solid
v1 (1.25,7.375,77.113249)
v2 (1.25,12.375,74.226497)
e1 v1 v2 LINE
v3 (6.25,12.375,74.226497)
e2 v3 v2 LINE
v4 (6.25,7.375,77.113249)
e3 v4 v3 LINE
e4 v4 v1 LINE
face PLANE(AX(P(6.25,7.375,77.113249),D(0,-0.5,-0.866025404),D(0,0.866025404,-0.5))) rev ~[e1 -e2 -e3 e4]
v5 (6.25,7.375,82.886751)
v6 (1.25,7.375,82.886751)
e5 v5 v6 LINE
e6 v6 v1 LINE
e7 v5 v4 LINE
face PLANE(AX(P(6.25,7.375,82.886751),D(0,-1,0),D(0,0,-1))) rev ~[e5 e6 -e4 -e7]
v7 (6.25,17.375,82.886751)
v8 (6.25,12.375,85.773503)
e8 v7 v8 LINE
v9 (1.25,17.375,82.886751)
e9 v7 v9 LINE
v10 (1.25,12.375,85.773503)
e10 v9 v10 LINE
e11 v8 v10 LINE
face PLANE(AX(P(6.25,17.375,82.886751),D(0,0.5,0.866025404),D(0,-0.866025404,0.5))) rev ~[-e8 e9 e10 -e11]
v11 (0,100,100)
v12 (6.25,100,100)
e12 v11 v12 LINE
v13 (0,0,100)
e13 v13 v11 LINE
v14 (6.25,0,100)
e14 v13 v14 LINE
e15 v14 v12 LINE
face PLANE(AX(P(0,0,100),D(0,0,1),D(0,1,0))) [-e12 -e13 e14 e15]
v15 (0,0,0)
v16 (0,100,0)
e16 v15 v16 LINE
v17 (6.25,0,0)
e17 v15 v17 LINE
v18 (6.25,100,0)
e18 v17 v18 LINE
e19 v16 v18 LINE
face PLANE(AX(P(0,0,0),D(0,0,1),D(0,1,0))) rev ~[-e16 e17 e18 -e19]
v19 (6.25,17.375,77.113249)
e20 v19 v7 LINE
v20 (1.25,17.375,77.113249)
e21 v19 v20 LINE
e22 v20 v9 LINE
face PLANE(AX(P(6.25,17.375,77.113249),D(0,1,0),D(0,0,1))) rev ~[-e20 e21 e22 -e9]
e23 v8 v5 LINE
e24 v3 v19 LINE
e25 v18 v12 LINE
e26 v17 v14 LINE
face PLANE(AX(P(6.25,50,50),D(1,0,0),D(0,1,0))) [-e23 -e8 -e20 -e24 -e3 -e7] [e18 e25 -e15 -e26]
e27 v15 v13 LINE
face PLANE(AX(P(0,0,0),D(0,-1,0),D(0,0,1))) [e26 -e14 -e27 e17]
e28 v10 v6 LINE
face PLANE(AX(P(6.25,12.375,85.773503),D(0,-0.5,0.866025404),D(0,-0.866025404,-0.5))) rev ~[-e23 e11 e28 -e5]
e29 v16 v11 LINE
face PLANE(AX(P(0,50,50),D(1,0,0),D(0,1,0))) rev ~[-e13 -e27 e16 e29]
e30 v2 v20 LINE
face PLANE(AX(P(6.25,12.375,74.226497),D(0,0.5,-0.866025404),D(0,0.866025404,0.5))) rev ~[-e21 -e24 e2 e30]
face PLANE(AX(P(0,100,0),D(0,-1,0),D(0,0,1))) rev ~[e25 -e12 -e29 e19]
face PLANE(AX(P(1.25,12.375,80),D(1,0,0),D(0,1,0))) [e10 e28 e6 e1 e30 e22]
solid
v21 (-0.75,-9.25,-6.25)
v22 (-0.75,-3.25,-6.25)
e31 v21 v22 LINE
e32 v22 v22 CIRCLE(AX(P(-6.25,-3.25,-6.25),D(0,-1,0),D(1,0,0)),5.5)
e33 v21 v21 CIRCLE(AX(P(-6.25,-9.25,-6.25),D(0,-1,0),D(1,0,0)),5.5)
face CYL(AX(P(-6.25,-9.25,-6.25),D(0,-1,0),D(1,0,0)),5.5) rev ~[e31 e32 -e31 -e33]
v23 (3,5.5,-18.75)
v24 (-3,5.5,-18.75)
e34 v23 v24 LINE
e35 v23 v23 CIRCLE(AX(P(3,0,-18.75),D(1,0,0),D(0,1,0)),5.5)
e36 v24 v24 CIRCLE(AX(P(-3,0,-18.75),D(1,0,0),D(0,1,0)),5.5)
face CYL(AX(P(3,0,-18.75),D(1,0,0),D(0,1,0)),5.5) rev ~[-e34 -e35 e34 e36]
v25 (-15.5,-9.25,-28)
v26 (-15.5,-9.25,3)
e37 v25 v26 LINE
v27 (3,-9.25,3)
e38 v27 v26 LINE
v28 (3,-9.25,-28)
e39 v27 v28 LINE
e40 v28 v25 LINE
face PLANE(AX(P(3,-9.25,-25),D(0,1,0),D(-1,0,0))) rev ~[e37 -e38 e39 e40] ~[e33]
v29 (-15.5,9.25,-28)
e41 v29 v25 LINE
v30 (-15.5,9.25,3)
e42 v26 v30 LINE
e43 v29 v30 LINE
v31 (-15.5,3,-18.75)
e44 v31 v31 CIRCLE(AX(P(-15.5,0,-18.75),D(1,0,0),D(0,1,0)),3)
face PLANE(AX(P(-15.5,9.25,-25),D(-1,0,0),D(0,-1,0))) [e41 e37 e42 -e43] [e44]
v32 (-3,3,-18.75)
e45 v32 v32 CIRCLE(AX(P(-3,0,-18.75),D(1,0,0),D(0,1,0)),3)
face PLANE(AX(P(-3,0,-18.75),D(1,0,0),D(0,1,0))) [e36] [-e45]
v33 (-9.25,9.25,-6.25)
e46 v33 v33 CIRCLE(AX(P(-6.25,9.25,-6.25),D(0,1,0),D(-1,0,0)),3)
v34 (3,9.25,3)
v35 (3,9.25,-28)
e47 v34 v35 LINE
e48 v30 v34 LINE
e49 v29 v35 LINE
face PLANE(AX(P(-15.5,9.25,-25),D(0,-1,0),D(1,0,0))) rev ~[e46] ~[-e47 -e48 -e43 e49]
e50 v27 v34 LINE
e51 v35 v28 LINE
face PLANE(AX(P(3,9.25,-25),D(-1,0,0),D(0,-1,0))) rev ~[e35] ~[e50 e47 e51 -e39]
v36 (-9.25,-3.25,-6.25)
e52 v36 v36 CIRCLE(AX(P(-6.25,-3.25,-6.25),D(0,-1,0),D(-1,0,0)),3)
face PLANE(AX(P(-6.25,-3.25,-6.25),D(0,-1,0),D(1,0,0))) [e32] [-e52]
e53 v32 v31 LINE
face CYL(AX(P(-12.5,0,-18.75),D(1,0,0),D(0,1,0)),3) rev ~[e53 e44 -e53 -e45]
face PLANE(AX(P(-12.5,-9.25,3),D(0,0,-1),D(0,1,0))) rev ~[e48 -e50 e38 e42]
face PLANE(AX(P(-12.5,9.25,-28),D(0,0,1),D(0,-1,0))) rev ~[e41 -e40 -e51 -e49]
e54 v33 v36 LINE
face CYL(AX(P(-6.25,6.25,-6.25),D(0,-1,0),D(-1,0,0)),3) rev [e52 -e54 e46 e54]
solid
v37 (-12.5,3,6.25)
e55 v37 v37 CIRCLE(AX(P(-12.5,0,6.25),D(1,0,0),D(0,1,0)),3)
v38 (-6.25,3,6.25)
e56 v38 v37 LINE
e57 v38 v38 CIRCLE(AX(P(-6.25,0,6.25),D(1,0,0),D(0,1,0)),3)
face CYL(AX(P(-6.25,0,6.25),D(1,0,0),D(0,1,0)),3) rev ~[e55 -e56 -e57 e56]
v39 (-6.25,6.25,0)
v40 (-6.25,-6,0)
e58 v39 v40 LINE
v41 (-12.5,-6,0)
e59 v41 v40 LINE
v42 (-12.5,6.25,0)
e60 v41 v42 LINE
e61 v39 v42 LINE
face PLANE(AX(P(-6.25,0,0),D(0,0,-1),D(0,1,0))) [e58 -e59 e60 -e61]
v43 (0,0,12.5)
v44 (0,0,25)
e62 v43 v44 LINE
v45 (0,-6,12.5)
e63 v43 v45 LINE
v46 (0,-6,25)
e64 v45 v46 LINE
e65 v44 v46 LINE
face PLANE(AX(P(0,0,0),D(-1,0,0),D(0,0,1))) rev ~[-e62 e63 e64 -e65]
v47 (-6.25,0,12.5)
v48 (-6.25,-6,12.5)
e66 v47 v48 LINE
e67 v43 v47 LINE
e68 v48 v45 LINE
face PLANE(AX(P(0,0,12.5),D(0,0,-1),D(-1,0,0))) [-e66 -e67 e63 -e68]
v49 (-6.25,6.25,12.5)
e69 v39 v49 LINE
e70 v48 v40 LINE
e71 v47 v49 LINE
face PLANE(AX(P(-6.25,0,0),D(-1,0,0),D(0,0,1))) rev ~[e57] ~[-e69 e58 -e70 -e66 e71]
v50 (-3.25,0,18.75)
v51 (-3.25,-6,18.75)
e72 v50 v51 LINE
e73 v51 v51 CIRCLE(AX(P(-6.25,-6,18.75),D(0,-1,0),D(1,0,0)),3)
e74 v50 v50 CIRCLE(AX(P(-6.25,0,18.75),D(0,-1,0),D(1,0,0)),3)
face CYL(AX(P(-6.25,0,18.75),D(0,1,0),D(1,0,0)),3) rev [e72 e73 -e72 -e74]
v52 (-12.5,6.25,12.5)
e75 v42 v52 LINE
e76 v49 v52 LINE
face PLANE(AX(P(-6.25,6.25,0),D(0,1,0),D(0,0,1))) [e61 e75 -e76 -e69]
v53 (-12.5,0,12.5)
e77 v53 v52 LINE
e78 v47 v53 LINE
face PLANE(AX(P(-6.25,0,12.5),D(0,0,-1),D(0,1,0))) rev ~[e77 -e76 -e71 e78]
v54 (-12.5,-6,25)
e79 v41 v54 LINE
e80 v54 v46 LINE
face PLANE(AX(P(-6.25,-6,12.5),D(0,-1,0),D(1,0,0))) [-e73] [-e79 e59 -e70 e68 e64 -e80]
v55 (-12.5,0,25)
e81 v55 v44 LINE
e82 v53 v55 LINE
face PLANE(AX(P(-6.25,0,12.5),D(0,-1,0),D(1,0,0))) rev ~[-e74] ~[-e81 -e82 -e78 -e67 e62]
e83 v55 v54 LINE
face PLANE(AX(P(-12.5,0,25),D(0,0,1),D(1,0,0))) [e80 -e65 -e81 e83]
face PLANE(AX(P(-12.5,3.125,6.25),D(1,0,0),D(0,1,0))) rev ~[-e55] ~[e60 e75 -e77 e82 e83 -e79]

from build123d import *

# Parameters (mm, degrees)
F0_W          = 12.5
F0_H          = 25
F0_R          = 3
F1_DEPTH      = 6
F3_START      = -6.25
F2_W          = 6.25
F2_H          = 12.5
F3_DEPTH      = 6.25
F4_W          = 6.25
F4_H          = 12.5
F5_DEPTH      = 25
F6_R          = 3
F7_DEPTH      = 25
F8_W          = 12.5
F8_H          = 25
F9_DEPTH      = 6.25
F9_DEPTH_BACK = 6.25
F10_R         = 3
F11_DEPTH     = 25
F12_R         = 3
F13_DEPTH     = 25
F14_DEPTH     = 3
F15_DEPTH     = 3
F16_DEPTH     = 3
F17_DEPTH     = 3
F18_DEPTH     = 3
F19_DEPTH     = 3
F20_R         = 5.5
F20_R_2       = 3
F21_DEPTH     = 6
F22_R         = 5.5
F22_R_2       = 3
F23_DEPTH     = 6
F24_W         = 100
F24_H         = 100
F25_DEPTH     = 6.25
F27_DEPTH     = 5


with BuildPart() as f1:
    # F0 (on Front) → F1 (new body)
    with BuildSketch(Plane.XZ):
        with Locations((-6.25, 12.5)):
            Rectangle(F0_W, F0_H)
        with Locations((-6.25, 18.75)):
            Circle(F0_R, mode=Mode.SUBTRACT)
    extrude(amount=F1_DEPTH)

    # F2 (on Right) → F3 (join)
    with BuildSketch(Plane.YZ.offset(F3_START)):
        with Locations((3.125, 6.25)):
            Rectangle(F2_W, F2_H)
    extrude(amount=-F3_DEPTH)

    # F4 (on face) → F5 (cut)
    with BuildSketch(Plane(origin=(0, 0, 0), x_dir=(-1, 0, 0), z_dir=(0, 1, 0))):
        with Locations((3.125, 6.25)):
            Rectangle(F4_W, F4_H)
    extrude(amount=-F5_DEPTH, mode=Mode.SUBTRACT)

    # F6 (on face) → F7 (cut)
    with BuildSketch(Plane.YZ.offset(-6.25)):
        with Locations((0, 6.25)):
            Circle(F6_R)
    extrude(amount=-F7_DEPTH, mode=Mode.SUBTRACT)


with BuildPart() as f9:
    # F8 (on Front) → F9 (new body, two sides)
    with BuildSketch(Plane.XZ) as f9_sk:
        with Locations((-6.25, -12.5)):
            Rectangle(F8_W, F8_H)
    extrude(amount=-F9_DEPTH)
    extrude(f9_sk.sketch, amount=F9_DEPTH_BACK)

    # F10 (on face) → F11 (cut)
    with BuildSketch(Plane(origin=(0, 6.25, 0), x_dir=(-1, 0, 0), z_dir=(0, 1, 0))):
        with Locations((6.25, -6.25)):
            Circle(F10_R)
    extrude(amount=-F11_DEPTH, mode=Mode.SUBTRACT)

    # F12 (on face) → F13 (cut)
    with BuildSketch(Plane.YZ):
        with Locations((0, -18.75)):
            Circle(F12_R)
    extrude(amount=-F13_DEPTH, mode=Mode.SUBTRACT)

    # F14 (add): a face of the model
    f14_faces = [f9.faces().sort_by_distance(p)[0] for p in [
        (-6.25, -6.25, -13.1217404261),
    ]]
    extrude(f14_faces, amount=F14_DEPTH)

    # F15 (add): a face of the model
    f15_faces = [f9.faces().sort_by_distance(p)[0] for p in [
        (-6.25, 6.25, -13.1217404261),
    ]]
    extrude(f15_faces, amount=F15_DEPTH)

    # F16 (add): a face of the model
    f16_faces = [f9.faces().sort_by_distance(p)[0] for p in [
        (0, 0, -12.0930351415),
    ]]
    extrude(f16_faces, amount=F16_DEPTH)

    # F17 (add): a face of the model
    f17_faces = [f9.faces().sort_by_distance(p)[0] for p in [
        (-12.5, 0, -12.0930351415),
    ]]
    extrude(f17_faces, amount=F17_DEPTH)

    # F18 (add): a face of the model
    f18_faces = [f9.faces().sort_by_distance(p)[0] for p in [
        (-6.25, 0, 0),
    ]]
    extrude(f18_faces, amount=F18_DEPTH)

    # F19 (add): a face of the model
    f19_faces = [f9.faces().sort_by_distance(p)[0] for p in [
        (-6.25, 0, -25),
    ]]
    extrude(f19_faces, amount=F19_DEPTH)

    # F20 (on face) → F21 (cut)
    with BuildSketch(Plane.YZ.offset(3)):
        with Locations((0, -18.75)):
            Circle(F20_R)
        with Locations((0, -18.75)):
            Circle(F20_R_2, mode=Mode.SUBTRACT)
    extrude(amount=-F21_DEPTH, mode=Mode.SUBTRACT)

    # F22 (on face) → F23 (cut)
    with BuildSketch(Plane.XZ.offset(9.25)):
        with Locations((-6.25, -6.25)):
            Circle(F22_R)
        with Locations((-6.25, -6.25)):
            Circle(F22_R_2, mode=Mode.SUBTRACT)
    extrude(amount=-F23_DEPTH, mode=Mode.SUBTRACT)


with BuildPart() as f25:
    # F24 (on Right) → F25 (new body)
    with BuildSketch(Plane.YZ):
        with Locations((50, 50)):
            Rectangle(F24_W, F24_H)
    extrude(amount=F25_DEPTH)

    # F26 (on face) → F27 (cut)
    with BuildSketch(Plane.YZ.offset(6.25)):
        Polygon((12.375, 74.2264973081), (17.375, 77.1132486541), (17.375, 82.8867513459), (12.375, 85.7735026919), (7.375, 82.8867513459), (7.375, 77.1132486541), align=None)
    extrude(amount=-F27_DEPTH, mode=Mode.SUBTRACT)


solid = Compound([f1.part, f9.part, f25.part])
